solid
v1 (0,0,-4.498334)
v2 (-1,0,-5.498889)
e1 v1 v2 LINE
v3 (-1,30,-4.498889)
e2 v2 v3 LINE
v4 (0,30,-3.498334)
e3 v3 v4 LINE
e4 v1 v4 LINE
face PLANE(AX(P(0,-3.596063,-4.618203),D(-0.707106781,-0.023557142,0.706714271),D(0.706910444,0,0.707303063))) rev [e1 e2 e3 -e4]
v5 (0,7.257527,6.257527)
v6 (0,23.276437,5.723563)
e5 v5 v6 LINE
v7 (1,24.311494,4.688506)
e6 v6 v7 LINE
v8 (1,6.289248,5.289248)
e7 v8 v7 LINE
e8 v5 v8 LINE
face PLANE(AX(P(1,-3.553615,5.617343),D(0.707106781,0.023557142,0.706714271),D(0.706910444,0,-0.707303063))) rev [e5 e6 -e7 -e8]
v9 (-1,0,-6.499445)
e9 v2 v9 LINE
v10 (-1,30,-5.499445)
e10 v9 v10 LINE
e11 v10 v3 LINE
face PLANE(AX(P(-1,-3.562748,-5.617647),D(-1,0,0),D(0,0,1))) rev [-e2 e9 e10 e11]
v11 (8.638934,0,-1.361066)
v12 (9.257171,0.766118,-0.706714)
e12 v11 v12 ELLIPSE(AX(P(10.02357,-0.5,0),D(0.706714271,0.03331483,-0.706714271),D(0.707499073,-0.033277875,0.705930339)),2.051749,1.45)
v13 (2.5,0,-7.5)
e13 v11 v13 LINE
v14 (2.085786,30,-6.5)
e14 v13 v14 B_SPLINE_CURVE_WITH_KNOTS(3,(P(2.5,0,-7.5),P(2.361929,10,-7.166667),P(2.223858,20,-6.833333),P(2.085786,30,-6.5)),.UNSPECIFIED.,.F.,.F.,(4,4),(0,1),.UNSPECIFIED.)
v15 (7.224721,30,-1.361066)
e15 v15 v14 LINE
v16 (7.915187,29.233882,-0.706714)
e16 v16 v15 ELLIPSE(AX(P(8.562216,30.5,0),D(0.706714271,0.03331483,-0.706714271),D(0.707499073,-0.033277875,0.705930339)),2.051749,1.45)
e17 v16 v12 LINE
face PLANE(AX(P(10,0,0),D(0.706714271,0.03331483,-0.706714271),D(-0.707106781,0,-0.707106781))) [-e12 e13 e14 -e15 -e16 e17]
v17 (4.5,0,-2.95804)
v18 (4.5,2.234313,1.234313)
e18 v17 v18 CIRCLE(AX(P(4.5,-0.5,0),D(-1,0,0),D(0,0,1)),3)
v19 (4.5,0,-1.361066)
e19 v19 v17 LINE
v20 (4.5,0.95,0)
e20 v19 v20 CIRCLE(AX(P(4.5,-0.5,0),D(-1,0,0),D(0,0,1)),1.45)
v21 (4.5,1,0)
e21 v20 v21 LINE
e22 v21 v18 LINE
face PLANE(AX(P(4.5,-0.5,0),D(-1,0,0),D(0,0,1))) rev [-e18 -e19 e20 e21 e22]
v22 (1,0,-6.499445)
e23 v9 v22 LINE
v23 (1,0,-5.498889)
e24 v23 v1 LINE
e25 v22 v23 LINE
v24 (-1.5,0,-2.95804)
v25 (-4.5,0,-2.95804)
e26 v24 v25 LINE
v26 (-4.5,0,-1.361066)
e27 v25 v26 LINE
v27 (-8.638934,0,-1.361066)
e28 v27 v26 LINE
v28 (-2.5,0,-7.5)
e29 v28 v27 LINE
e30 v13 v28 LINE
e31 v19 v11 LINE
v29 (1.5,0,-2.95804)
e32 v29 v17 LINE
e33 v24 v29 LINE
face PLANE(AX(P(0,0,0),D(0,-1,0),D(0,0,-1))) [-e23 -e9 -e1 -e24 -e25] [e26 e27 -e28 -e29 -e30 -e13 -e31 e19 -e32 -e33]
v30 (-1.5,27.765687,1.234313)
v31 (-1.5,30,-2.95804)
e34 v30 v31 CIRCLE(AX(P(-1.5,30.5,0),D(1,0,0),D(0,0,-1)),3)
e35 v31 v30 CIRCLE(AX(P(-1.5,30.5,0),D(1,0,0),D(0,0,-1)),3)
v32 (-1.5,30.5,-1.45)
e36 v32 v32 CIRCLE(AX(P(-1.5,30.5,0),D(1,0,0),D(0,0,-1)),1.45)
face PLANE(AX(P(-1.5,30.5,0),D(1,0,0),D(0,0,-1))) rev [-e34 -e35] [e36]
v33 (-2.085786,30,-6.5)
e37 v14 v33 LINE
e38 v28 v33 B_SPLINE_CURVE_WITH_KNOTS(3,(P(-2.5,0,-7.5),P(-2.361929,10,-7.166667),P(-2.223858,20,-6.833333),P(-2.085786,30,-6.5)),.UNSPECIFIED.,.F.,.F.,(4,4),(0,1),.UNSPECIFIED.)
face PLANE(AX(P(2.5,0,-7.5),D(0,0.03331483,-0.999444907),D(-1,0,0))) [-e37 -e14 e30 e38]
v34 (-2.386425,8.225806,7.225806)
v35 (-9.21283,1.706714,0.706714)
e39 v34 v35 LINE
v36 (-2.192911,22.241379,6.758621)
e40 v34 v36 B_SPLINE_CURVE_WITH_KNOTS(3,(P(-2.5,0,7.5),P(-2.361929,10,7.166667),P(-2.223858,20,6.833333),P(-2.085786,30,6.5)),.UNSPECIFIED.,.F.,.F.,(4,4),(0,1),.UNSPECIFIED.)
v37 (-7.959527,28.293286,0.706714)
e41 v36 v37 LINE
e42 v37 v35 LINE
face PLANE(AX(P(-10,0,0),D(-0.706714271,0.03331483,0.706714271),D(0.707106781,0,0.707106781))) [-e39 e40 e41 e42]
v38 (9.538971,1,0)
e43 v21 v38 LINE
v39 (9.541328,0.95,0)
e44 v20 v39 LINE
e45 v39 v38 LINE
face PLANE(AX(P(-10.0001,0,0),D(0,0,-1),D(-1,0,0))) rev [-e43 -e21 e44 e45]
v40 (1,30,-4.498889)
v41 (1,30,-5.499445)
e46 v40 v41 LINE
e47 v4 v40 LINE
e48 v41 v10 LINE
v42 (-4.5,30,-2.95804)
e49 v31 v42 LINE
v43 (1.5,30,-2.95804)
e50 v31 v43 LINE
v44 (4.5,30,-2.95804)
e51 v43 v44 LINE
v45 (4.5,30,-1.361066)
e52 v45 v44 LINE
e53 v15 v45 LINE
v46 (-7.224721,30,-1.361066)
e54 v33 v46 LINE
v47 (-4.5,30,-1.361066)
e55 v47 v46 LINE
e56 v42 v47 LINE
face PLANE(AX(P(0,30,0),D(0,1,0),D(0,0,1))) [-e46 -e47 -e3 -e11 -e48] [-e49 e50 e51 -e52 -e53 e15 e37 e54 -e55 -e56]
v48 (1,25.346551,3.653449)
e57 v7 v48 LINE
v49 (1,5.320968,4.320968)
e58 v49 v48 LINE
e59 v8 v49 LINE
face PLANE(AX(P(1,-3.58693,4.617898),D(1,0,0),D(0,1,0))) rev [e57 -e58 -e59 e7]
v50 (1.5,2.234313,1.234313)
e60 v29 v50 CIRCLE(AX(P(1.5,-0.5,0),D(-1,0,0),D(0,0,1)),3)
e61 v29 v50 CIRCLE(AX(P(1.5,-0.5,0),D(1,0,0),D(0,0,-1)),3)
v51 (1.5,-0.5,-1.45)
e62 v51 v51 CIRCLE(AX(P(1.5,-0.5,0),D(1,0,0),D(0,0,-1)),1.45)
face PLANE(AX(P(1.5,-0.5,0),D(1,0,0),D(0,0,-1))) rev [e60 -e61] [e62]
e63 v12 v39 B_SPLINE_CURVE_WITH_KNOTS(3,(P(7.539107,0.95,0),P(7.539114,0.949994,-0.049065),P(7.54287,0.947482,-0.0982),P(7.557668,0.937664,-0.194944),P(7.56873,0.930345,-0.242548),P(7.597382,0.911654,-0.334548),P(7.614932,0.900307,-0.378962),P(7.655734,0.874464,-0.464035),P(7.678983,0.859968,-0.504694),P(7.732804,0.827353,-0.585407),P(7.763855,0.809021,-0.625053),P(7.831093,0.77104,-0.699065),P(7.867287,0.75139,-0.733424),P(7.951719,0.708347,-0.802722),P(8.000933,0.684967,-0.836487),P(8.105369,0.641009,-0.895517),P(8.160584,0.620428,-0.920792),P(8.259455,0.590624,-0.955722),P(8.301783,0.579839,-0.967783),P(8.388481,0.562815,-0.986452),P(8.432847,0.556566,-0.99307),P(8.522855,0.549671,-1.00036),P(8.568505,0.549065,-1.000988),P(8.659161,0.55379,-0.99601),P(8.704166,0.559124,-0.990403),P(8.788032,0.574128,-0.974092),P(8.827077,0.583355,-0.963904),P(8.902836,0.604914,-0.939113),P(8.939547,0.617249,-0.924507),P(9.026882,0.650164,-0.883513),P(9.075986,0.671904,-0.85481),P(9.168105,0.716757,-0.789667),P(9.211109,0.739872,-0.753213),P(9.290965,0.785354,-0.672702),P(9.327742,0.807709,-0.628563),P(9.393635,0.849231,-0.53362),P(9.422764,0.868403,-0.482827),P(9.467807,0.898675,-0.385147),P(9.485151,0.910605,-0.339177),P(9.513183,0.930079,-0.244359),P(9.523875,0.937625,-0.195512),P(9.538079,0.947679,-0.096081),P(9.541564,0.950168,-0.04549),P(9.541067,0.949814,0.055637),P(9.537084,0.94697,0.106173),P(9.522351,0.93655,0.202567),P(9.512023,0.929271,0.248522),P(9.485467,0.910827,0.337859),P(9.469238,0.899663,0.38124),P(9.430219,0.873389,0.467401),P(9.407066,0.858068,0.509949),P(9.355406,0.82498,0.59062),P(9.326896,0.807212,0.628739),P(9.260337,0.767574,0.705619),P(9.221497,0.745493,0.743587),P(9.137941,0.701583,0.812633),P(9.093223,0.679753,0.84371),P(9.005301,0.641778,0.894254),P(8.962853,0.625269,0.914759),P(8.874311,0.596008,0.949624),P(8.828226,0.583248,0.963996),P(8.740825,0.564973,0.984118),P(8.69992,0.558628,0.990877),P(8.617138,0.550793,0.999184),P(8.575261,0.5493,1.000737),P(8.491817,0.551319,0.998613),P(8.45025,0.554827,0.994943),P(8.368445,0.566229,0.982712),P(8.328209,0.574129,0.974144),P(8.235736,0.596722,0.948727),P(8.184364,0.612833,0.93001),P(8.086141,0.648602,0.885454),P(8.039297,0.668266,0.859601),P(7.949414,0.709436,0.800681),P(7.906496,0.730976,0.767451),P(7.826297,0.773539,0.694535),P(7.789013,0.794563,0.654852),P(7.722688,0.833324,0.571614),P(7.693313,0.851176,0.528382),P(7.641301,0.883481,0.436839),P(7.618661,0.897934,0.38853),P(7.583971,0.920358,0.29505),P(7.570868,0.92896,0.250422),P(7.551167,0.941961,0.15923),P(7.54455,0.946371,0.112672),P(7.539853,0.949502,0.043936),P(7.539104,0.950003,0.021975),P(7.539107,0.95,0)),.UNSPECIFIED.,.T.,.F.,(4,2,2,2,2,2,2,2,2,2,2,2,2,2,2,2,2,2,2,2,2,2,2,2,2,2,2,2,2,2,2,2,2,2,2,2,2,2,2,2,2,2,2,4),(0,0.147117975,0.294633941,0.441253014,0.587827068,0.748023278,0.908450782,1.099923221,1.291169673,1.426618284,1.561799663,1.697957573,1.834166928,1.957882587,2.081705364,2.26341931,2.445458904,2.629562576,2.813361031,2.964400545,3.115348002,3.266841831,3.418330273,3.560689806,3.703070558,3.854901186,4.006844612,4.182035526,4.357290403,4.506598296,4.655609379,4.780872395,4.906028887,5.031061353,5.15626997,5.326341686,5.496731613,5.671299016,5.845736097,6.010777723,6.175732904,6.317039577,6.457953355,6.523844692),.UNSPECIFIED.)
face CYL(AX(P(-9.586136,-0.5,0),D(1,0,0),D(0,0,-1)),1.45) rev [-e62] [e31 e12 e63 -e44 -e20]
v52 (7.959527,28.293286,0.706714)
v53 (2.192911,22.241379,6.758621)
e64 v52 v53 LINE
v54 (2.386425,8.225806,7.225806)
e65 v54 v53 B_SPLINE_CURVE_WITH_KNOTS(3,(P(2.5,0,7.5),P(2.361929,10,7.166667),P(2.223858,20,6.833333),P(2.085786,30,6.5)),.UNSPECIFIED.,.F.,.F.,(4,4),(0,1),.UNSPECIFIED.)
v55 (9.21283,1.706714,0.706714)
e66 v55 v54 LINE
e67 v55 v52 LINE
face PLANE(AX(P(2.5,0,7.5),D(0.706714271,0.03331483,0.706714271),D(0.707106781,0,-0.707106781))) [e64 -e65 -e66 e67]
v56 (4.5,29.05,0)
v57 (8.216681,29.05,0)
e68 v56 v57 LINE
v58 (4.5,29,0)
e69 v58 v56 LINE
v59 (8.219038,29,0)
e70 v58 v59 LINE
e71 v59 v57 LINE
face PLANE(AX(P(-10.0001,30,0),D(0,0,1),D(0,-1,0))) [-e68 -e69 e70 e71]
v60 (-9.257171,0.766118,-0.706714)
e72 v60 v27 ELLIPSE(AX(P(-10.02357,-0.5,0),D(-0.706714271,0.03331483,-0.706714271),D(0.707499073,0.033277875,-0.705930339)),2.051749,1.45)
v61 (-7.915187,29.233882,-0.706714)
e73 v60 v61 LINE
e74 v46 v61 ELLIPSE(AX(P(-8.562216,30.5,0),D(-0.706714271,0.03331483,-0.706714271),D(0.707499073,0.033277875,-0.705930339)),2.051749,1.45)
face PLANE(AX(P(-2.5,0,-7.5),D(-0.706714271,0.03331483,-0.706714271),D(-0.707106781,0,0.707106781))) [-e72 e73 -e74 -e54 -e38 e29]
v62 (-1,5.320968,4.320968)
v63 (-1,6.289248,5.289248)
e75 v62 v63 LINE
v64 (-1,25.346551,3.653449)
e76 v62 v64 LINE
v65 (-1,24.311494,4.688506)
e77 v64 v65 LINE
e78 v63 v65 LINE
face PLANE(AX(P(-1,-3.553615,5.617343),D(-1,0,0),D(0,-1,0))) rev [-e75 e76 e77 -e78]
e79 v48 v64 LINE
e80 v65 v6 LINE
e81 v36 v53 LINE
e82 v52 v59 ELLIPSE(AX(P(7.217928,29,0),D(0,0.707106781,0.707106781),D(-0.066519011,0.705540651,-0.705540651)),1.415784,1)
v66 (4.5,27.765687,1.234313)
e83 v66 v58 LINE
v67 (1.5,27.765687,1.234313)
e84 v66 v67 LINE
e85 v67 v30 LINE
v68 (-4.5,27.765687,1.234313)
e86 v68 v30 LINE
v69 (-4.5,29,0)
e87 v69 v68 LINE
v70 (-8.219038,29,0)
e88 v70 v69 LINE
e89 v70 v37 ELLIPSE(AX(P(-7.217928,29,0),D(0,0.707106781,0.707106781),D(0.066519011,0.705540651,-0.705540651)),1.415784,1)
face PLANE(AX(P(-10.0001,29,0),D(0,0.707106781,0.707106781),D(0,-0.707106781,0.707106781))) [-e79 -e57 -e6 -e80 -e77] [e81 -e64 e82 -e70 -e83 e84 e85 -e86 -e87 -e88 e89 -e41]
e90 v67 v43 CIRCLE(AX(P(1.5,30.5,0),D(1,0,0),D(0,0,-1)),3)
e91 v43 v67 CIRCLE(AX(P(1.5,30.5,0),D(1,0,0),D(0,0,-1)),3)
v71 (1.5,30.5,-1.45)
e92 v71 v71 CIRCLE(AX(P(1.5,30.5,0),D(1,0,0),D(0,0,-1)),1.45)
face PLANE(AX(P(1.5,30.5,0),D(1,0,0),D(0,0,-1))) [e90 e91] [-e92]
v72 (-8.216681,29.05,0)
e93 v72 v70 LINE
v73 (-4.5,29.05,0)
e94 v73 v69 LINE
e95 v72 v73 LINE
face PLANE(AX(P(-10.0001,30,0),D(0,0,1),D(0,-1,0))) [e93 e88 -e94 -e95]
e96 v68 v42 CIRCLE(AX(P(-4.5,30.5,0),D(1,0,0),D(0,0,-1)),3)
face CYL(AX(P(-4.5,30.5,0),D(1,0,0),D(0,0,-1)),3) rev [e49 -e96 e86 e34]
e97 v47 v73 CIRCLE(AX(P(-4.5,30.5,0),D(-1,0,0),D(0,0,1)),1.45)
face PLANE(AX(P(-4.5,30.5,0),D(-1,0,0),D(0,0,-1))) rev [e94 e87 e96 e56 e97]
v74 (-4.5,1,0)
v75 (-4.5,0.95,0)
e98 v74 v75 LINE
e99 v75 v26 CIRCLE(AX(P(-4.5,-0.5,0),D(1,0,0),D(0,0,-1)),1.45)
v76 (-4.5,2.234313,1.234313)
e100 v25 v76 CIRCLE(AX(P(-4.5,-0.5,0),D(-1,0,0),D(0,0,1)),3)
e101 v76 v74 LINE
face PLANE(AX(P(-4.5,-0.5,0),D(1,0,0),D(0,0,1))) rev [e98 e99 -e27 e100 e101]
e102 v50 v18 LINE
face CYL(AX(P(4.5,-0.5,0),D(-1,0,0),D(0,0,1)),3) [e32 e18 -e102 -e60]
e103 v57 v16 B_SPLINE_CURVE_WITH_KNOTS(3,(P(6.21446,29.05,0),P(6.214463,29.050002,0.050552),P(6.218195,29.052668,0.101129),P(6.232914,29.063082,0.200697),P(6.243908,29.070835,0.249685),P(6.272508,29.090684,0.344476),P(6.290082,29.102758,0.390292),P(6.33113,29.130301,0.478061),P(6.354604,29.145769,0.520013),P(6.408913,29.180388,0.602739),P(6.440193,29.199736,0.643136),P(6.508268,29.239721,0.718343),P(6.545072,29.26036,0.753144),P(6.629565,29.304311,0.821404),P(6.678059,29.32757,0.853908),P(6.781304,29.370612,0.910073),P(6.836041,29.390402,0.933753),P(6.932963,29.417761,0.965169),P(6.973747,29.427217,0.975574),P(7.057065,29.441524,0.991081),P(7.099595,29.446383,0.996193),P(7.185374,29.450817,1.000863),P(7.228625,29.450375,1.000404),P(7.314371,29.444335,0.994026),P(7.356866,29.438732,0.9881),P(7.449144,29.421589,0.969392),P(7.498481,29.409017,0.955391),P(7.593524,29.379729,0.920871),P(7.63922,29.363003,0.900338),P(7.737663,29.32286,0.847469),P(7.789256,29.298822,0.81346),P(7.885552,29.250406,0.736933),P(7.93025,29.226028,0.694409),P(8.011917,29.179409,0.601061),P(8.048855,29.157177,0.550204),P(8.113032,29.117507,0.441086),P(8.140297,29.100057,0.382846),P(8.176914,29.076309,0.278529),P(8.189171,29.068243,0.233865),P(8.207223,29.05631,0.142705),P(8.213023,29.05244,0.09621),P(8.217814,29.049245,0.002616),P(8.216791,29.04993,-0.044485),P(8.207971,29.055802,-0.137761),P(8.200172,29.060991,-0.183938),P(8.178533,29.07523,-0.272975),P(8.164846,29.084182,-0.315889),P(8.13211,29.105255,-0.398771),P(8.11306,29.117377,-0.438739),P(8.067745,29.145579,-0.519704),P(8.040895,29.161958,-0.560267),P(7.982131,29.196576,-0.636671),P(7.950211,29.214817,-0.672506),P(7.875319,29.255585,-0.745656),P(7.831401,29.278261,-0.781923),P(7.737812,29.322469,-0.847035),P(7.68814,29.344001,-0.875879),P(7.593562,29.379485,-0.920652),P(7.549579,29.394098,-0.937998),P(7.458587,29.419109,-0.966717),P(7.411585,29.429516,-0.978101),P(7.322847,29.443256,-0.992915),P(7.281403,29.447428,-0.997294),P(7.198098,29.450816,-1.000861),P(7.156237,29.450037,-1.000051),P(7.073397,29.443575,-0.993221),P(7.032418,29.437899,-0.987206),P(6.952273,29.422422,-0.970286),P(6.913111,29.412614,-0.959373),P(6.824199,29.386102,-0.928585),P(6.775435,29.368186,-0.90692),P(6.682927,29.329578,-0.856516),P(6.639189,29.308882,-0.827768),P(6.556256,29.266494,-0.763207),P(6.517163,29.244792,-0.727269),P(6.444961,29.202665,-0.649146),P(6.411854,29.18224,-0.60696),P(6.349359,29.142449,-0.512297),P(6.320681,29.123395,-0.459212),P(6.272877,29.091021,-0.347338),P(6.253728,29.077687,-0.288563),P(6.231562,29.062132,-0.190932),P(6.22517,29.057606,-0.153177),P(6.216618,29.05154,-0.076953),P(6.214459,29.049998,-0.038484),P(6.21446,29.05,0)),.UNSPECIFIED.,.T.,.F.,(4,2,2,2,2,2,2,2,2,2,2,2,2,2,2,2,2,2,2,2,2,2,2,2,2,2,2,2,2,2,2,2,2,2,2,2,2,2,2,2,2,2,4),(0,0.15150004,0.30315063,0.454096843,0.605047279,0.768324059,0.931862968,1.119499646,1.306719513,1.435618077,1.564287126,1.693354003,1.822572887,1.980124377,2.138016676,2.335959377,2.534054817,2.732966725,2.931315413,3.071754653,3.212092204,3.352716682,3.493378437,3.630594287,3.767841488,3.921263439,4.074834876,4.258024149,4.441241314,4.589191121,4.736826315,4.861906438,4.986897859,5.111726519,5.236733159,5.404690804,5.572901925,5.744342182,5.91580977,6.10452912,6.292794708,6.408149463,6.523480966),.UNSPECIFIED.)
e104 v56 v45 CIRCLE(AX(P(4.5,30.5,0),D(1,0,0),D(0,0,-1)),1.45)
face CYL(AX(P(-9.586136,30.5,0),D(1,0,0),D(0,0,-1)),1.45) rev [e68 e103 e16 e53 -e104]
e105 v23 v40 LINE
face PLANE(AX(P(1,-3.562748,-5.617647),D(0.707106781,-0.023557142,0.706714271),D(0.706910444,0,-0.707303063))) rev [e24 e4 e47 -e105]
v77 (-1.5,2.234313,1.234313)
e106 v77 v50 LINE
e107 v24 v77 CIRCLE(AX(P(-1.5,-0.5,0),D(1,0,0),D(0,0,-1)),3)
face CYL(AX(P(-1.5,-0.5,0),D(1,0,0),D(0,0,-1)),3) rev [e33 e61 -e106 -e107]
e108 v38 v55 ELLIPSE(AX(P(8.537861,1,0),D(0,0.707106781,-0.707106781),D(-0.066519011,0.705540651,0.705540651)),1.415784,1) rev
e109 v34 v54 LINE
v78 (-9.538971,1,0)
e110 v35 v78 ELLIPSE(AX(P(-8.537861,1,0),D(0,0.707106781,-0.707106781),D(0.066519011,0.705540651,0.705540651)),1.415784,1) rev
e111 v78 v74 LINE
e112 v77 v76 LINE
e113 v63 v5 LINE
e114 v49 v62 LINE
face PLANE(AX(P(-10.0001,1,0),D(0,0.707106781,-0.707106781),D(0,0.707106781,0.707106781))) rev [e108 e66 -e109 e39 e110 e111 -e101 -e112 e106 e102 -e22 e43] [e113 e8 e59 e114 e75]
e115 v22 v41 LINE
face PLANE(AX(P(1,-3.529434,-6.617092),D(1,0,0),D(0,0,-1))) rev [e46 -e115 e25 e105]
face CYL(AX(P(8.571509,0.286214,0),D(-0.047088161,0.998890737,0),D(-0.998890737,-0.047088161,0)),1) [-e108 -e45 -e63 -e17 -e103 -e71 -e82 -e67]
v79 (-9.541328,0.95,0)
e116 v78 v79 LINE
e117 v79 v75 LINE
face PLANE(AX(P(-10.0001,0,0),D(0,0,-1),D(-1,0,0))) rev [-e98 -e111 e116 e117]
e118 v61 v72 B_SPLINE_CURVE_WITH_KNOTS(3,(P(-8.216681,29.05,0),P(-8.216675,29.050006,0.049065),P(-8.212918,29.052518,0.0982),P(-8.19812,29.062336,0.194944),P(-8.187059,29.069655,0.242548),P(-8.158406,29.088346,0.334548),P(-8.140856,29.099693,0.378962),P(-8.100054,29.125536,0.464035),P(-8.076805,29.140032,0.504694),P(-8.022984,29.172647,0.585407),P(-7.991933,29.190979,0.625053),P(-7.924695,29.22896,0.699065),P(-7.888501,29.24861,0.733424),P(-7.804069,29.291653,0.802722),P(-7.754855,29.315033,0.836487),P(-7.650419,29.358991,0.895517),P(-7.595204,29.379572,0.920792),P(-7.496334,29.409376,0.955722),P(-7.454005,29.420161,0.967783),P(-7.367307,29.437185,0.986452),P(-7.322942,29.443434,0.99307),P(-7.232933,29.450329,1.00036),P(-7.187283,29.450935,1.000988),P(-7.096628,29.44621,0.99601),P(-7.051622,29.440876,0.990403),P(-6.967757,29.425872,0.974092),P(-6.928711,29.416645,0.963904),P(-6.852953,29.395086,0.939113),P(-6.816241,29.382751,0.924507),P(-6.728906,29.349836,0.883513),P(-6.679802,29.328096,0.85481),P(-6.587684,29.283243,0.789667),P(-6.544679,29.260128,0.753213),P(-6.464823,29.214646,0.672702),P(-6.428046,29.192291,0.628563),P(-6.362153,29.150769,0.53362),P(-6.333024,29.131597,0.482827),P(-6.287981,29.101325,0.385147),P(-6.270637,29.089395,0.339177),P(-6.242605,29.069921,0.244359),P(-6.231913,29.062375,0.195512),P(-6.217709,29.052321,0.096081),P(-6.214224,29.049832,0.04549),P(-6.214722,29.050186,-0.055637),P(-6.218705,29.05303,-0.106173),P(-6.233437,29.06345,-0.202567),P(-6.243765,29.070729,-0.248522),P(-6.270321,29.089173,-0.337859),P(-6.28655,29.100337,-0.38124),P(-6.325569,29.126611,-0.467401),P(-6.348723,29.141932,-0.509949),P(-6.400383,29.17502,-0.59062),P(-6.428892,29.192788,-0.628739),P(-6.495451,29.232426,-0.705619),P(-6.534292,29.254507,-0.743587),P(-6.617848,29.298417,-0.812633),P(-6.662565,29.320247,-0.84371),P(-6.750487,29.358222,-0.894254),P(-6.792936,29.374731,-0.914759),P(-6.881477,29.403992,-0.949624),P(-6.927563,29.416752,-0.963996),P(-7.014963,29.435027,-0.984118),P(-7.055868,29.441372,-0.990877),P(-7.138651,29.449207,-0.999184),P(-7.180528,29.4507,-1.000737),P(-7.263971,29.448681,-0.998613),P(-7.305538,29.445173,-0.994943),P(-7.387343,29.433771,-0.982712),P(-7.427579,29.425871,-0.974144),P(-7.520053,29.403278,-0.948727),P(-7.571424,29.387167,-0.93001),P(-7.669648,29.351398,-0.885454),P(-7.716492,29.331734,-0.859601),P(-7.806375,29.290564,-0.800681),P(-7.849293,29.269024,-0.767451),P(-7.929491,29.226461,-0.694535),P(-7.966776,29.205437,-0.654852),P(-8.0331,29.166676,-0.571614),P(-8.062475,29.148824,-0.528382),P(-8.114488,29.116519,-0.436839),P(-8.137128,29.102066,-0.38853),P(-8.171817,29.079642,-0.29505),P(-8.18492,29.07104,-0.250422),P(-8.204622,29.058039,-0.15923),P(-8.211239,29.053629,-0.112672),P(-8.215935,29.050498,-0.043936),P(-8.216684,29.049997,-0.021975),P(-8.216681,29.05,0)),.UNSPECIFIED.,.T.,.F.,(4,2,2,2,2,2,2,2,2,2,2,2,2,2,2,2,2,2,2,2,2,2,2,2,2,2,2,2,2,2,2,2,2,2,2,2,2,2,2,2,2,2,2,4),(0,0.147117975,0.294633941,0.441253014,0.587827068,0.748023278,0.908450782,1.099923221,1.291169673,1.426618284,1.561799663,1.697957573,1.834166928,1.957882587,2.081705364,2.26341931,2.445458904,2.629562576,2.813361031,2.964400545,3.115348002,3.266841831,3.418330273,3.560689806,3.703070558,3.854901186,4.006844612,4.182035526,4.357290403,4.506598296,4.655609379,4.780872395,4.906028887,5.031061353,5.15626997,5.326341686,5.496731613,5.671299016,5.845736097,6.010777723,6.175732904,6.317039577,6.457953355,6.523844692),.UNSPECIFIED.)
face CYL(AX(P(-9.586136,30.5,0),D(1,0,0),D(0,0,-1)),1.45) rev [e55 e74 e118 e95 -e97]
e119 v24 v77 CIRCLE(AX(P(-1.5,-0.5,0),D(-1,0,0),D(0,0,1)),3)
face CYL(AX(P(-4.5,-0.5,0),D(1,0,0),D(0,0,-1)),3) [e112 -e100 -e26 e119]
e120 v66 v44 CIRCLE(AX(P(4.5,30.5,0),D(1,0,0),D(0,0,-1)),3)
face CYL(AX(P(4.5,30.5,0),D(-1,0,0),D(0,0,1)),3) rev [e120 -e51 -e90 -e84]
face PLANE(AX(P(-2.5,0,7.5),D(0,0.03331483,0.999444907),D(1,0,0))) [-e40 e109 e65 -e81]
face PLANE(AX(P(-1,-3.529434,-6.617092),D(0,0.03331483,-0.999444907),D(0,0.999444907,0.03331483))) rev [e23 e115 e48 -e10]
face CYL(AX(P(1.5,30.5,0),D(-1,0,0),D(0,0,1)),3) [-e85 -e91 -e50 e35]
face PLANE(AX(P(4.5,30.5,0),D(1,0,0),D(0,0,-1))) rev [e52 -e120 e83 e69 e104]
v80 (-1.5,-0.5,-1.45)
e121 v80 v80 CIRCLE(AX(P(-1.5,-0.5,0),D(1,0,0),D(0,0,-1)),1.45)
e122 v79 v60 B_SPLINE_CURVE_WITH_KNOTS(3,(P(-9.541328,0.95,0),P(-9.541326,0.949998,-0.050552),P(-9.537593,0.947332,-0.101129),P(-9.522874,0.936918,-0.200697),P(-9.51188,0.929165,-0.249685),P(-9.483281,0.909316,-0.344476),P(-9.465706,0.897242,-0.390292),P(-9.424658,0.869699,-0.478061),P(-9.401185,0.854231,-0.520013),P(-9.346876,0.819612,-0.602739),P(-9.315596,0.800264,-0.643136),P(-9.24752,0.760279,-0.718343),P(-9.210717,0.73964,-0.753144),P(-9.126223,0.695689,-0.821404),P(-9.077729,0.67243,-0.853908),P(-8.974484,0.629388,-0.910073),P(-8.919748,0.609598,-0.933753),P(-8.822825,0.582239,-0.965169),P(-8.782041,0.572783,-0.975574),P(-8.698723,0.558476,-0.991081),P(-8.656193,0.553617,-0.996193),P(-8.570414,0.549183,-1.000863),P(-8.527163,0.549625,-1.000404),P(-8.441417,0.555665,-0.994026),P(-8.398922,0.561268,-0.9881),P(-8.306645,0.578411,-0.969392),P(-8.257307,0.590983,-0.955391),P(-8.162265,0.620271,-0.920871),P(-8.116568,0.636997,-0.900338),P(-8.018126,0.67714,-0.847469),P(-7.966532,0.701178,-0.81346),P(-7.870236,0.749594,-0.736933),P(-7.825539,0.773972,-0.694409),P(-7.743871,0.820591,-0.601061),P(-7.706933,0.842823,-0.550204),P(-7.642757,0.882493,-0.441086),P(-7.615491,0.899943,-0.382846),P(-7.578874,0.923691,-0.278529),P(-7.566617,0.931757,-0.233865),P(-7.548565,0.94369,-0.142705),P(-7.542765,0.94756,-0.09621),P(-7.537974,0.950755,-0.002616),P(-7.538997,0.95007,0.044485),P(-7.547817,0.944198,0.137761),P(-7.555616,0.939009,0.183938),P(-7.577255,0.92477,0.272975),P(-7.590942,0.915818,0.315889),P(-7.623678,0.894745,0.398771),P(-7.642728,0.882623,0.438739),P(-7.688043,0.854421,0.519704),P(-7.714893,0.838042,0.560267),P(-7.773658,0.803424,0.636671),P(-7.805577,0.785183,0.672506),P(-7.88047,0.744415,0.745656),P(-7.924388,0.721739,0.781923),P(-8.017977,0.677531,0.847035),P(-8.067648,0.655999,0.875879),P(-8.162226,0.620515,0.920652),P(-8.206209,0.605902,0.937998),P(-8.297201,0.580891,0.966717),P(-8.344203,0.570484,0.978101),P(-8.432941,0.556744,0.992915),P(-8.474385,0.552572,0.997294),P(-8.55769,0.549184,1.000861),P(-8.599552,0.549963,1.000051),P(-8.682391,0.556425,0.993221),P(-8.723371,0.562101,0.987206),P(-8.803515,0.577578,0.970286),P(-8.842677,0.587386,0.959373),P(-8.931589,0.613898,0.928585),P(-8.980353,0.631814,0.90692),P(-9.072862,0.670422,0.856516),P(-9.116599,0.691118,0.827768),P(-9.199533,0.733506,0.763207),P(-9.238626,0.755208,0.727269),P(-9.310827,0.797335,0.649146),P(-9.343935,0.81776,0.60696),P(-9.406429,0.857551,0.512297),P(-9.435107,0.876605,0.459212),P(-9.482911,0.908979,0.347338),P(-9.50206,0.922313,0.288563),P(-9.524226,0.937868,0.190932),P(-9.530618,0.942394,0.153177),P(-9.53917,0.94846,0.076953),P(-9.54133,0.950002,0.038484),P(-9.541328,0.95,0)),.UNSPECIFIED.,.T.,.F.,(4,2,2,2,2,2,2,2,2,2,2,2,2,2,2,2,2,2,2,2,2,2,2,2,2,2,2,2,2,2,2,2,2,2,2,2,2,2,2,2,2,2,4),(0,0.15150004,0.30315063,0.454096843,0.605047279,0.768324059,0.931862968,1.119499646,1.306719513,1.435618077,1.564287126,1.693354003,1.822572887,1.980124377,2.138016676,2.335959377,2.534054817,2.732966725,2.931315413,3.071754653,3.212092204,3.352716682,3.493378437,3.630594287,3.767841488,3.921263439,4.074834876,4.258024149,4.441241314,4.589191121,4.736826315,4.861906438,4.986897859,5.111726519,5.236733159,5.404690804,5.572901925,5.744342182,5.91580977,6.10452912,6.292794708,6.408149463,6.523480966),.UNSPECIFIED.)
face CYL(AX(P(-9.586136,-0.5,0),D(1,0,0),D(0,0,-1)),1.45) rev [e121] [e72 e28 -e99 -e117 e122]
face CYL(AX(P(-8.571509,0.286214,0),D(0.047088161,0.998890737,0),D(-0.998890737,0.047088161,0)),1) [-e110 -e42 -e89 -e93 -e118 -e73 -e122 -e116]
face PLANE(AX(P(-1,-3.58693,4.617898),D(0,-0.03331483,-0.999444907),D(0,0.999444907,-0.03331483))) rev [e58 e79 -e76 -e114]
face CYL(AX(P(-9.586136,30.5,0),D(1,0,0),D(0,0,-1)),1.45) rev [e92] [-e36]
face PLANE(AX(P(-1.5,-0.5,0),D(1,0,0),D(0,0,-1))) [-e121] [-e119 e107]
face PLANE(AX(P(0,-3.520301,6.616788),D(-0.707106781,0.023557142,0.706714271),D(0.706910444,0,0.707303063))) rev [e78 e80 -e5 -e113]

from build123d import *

# Parameters (mm, degrees)
LOFT1_DEPTH             = 30
LOFT1_DRAFT             = 1.9091524
CUT_EXTRUDE2_DEPTH      = 33.499999989
CUT_EXTRUDE2_DEPTH_BACK = 33.499999989
FILLET5_R               = 1
SKETCH4_R               = 3
BOSS_EXTRUDE1_DEPTH     = 1.5
CUT_EXTRUDE3_START      = 3
SKETCH5_R               = 3
CUT_EXTRUDE3_DEPTH      = 3
SKETCH7_R               = 3
CUT_EXTRUDE5_DEPTH      = 1.5
BOSS_EXTRUDE2_START     = -3
SKETCH8_R               = 3
BOSS_EXTRUDE2_DEPTH     = 3
CUT_EXTRUDE6_DEPTH      = 23.235565384
CUT_EXTRUDE6_DEPTH_BACK = 23.235565384
CUT_EXTRUDE7_DEPTH      = 23.523598989
CUT_EXTRUDE7_DEPTH_BACK = 23.523598989
CUT_EXTRUDE8_DEPTH      = 36.642580329
CUT_EXTRUDE8_DEPTH_BACK = 36.642580329
SKETCH11_R              = 1.45


# Read off the part's stored shape, not the designer's step: Loft1
with BuildPart() as part:
    # Loft1 outline → Loft1 (with draft: the straight prism first)
    with BuildSketch(Plane(origin=(0, 30, 0), x_dir=(1, 0, 0), z_dir=(0, 1, 0))):
        Polygon((2.085786438, 6.5), (-2.085786438, 6.5), (-8.585786438, 0), (-2.085786438, -6.5), (2.085786438, -6.5), (8.585786438, 0), align=None)
    extrude(amount=-LOFT1_DEPTH)
    # Loft1: the draft: its side faces are tilted about the plane it starts from
    loft1_sides = [part.faces().sort_by_distance(p)[0] for p in [
        (0, 15, -6.5),
        (-5.335786438, 15, -3.25),
        (-5.335786438, 15, 3.25),
        (0, 15, 6.5),
        (5.335786438, 15, 3.25),
        (5.335786438, 15, -3.25),
    ]]
    draft(loft1_sides, Plane(origin=(0, 30, 0), x_dir=(1, 0, 0), z_dir=(0, 1, 0)), LOFT1_DRAFT)

    # Sketch3 → Cut-Extrude2 (cut, two sides: drawn at the far end of the back side and taken through both)
    with BuildSketch(Plane(origin=(0, 0, 0), x_dir=(0, 0, -1), z_dir=(1, 0, 0)).offset(-CUT_EXTRUDE2_DEPTH_BACK)):
        Polygon((0, 30), (0, 29), (-6.75862069, 22.24137931), (-6.5, 30), align=None)
        Polygon((0, 0), (0, 1), (-7.225806452, 8.225806452), (-7.5, 0), align=None)
    extrude(amount=CUT_EXTRUDE2_DEPTH + CUT_EXTRUDE2_DEPTH_BACK, mode=Mode.SUBTRACT)

    # Fillet5
    # the kernel refuses this fillet: 1 mm, written as the material it takes off along each edge
    with BuildSketch(Plane(origin=(8.515337072, 31.494456763, 0), x_dir=(-0.7059303394201505, -0.033277874761044414, -0.7074990734534847), z_dir=(0.04708816012216718, -0.9988907373563483, 0))) as fillet5_piece_1:
        with BuildLine():
            CenterArc((FILLET5_R * 0.998890737356, -FILLET5_R), FILLET5_R, 90, 89.936408669)
            Line((-FILLET5_R * 0.00110864672901, -FILLET5_R * 0.998890122125), (0, 0))
            Line((0, 0), (FILLET5_R * 0.998890737356, 0))
        make_face()
    extrude(amount=33.025547532, mode=Mode.SUBTRACT)
    with BuildSketch(Plane(origin=(-8.515337072, 31.494456763, 0), x_dir=(0.7059303394201496, -0.03327787476104438, -0.7074990734534856), z_dir=(-0.04708816012216718, -0.9988907373563483, 0))) as fillet5_piece_2:
        with BuildLine():
            CenterArc((FILLET5_R * 0.998890737356, FILLET5_R), FILLET5_R, 180.063591331, 89.936408669)
            Line((-FILLET5_R * 0.00110864672902, FILLET5_R * 0.998890122125), (0, 0))
            Line((0, 0), (FILLET5_R * 0.998890737356, 0))
        make_face()
    extrude(amount=33.025547532, mode=Mode.SUBTRACT)

    # Sketch4 → Boss-Extrude1 (add, symmetric)
    with BuildSketch(Plane(origin=(0, 0, 0), x_dir=(0, 0, -1), z_dir=(1, 0, 0))):
        with Locations((0, 30.5)):
            Circle(SKETCH4_R)
    extrude(amount=BOSS_EXTRUDE1_DEPTH, both=True)

    # Sketch5 → Cut-Extrude3 (cut)
    with BuildSketch(Plane(origin=(1.5, 0, 0), x_dir=(0, 0, -1), z_dir=(1, 0, 0)).offset(CUT_EXTRUDE3_START)):
        with Locations((0, 30.5)):
            Circle(SKETCH5_R)
    cut_extrude3 = extrude(amount=-CUT_EXTRUDE3_DEPTH, mode=Mode.SUBTRACT)

    # Mirror1: Cut-Extrude3 across plane
    add(cut_extrude3.mirror(Plane(origin=(0, 0, 0), x_dir=(0, 0, 1), z_dir=(1, 0, 0))), mode=Mode.SUBTRACT)

    # Sketch7 → Cut-Extrude5 (cut, symmetric)
    with BuildSketch(Plane(origin=(0, 0, 0), x_dir=(0, 0, -1), z_dir=(1, 0, 0))):
        with Locations((0, -0.5)):
            Circle(SKETCH7_R)
    extrude(amount=CUT_EXTRUDE5_DEPTH, both=True, mode=Mode.SUBTRACT)

    # Sketch8 → Boss-Extrude2 (add)
    with BuildSketch(Plane.ZY.offset(-1.5).offset(BOSS_EXTRUDE2_START)):
        with Locations((0, -0.5)):
            Circle(SKETCH8_R)
    boss_extrude2 = extrude(amount=BOSS_EXTRUDE2_DEPTH)

    # Mirror2: Boss-Extrude2 across plane
    add(boss_extrude2.mirror(Plane(origin=(0, 0, 0), x_dir=(0, 0, 1), z_dir=(1, 0, 0))))

    # Sketch9 → Cut-Extrude6 (cut, two sides: drawn at the far end of the back side and taken through both)
    with BuildSketch(Plane(origin=(0, 14.98387035, -0.499462345), x_dir=(1, 0, 0), z_dir=(0, 0.9994449069791544, -0.03331483023263851)).offset(-CUT_EXTRUDE6_DEPTH_BACK)):
        Polygon((-1, -4.495836802), (1, -4.495836802), (1, -5.495836802), (0, -6.495836802), (-1, -5.495836802), align=None)
    extrude(amount=CUT_EXTRUDE6_DEPTH + CUT_EXTRUDE6_DEPTH_BACK, mode=Mode.SUBTRACT)

    # Sketch10 → Cut-Extrude7 (cut, two sides: drawn at the far end of the back side and taken through both)
    with BuildSketch(Plane(origin=(0, 14.750277469, 0.491675916), x_dir=(1, 0, 0), z_dir=(0, 0.9994449069791544, 0.03331483023263851)).offset(-CUT_EXTRUDE7_DEPTH_BACK)):
        Polygon((-1, 6.495836802), (1, 6.495836802), (1, 5.495836802), (0, 4.495836802), (-1, 5.495836802), align=None)
    extrude(amount=CUT_EXTRUDE7_DEPTH + CUT_EXTRUDE7_DEPTH_BACK, mode=Mode.SUBTRACT)

    # Sketch11 → Cut-Extrude8 (cut, two sides: drawn at the far end of the back side and taken through both)
    with BuildSketch(Plane(origin=(0, 0, 0), x_dir=(0, 0, -1), z_dir=(1, 0, 0)).offset(-CUT_EXTRUDE8_DEPTH_BACK)):
        with Locations((0, 30.5)):
            Circle(SKETCH11_R)
        with Locations((0, -0.5)):
            Circle(SKETCH11_R)
    extrude(amount=CUT_EXTRUDE8_DEPTH + CUT_EXTRUDE8_DEPTH_BACK, mode=Mode.SUBTRACT)


solid = part.part
